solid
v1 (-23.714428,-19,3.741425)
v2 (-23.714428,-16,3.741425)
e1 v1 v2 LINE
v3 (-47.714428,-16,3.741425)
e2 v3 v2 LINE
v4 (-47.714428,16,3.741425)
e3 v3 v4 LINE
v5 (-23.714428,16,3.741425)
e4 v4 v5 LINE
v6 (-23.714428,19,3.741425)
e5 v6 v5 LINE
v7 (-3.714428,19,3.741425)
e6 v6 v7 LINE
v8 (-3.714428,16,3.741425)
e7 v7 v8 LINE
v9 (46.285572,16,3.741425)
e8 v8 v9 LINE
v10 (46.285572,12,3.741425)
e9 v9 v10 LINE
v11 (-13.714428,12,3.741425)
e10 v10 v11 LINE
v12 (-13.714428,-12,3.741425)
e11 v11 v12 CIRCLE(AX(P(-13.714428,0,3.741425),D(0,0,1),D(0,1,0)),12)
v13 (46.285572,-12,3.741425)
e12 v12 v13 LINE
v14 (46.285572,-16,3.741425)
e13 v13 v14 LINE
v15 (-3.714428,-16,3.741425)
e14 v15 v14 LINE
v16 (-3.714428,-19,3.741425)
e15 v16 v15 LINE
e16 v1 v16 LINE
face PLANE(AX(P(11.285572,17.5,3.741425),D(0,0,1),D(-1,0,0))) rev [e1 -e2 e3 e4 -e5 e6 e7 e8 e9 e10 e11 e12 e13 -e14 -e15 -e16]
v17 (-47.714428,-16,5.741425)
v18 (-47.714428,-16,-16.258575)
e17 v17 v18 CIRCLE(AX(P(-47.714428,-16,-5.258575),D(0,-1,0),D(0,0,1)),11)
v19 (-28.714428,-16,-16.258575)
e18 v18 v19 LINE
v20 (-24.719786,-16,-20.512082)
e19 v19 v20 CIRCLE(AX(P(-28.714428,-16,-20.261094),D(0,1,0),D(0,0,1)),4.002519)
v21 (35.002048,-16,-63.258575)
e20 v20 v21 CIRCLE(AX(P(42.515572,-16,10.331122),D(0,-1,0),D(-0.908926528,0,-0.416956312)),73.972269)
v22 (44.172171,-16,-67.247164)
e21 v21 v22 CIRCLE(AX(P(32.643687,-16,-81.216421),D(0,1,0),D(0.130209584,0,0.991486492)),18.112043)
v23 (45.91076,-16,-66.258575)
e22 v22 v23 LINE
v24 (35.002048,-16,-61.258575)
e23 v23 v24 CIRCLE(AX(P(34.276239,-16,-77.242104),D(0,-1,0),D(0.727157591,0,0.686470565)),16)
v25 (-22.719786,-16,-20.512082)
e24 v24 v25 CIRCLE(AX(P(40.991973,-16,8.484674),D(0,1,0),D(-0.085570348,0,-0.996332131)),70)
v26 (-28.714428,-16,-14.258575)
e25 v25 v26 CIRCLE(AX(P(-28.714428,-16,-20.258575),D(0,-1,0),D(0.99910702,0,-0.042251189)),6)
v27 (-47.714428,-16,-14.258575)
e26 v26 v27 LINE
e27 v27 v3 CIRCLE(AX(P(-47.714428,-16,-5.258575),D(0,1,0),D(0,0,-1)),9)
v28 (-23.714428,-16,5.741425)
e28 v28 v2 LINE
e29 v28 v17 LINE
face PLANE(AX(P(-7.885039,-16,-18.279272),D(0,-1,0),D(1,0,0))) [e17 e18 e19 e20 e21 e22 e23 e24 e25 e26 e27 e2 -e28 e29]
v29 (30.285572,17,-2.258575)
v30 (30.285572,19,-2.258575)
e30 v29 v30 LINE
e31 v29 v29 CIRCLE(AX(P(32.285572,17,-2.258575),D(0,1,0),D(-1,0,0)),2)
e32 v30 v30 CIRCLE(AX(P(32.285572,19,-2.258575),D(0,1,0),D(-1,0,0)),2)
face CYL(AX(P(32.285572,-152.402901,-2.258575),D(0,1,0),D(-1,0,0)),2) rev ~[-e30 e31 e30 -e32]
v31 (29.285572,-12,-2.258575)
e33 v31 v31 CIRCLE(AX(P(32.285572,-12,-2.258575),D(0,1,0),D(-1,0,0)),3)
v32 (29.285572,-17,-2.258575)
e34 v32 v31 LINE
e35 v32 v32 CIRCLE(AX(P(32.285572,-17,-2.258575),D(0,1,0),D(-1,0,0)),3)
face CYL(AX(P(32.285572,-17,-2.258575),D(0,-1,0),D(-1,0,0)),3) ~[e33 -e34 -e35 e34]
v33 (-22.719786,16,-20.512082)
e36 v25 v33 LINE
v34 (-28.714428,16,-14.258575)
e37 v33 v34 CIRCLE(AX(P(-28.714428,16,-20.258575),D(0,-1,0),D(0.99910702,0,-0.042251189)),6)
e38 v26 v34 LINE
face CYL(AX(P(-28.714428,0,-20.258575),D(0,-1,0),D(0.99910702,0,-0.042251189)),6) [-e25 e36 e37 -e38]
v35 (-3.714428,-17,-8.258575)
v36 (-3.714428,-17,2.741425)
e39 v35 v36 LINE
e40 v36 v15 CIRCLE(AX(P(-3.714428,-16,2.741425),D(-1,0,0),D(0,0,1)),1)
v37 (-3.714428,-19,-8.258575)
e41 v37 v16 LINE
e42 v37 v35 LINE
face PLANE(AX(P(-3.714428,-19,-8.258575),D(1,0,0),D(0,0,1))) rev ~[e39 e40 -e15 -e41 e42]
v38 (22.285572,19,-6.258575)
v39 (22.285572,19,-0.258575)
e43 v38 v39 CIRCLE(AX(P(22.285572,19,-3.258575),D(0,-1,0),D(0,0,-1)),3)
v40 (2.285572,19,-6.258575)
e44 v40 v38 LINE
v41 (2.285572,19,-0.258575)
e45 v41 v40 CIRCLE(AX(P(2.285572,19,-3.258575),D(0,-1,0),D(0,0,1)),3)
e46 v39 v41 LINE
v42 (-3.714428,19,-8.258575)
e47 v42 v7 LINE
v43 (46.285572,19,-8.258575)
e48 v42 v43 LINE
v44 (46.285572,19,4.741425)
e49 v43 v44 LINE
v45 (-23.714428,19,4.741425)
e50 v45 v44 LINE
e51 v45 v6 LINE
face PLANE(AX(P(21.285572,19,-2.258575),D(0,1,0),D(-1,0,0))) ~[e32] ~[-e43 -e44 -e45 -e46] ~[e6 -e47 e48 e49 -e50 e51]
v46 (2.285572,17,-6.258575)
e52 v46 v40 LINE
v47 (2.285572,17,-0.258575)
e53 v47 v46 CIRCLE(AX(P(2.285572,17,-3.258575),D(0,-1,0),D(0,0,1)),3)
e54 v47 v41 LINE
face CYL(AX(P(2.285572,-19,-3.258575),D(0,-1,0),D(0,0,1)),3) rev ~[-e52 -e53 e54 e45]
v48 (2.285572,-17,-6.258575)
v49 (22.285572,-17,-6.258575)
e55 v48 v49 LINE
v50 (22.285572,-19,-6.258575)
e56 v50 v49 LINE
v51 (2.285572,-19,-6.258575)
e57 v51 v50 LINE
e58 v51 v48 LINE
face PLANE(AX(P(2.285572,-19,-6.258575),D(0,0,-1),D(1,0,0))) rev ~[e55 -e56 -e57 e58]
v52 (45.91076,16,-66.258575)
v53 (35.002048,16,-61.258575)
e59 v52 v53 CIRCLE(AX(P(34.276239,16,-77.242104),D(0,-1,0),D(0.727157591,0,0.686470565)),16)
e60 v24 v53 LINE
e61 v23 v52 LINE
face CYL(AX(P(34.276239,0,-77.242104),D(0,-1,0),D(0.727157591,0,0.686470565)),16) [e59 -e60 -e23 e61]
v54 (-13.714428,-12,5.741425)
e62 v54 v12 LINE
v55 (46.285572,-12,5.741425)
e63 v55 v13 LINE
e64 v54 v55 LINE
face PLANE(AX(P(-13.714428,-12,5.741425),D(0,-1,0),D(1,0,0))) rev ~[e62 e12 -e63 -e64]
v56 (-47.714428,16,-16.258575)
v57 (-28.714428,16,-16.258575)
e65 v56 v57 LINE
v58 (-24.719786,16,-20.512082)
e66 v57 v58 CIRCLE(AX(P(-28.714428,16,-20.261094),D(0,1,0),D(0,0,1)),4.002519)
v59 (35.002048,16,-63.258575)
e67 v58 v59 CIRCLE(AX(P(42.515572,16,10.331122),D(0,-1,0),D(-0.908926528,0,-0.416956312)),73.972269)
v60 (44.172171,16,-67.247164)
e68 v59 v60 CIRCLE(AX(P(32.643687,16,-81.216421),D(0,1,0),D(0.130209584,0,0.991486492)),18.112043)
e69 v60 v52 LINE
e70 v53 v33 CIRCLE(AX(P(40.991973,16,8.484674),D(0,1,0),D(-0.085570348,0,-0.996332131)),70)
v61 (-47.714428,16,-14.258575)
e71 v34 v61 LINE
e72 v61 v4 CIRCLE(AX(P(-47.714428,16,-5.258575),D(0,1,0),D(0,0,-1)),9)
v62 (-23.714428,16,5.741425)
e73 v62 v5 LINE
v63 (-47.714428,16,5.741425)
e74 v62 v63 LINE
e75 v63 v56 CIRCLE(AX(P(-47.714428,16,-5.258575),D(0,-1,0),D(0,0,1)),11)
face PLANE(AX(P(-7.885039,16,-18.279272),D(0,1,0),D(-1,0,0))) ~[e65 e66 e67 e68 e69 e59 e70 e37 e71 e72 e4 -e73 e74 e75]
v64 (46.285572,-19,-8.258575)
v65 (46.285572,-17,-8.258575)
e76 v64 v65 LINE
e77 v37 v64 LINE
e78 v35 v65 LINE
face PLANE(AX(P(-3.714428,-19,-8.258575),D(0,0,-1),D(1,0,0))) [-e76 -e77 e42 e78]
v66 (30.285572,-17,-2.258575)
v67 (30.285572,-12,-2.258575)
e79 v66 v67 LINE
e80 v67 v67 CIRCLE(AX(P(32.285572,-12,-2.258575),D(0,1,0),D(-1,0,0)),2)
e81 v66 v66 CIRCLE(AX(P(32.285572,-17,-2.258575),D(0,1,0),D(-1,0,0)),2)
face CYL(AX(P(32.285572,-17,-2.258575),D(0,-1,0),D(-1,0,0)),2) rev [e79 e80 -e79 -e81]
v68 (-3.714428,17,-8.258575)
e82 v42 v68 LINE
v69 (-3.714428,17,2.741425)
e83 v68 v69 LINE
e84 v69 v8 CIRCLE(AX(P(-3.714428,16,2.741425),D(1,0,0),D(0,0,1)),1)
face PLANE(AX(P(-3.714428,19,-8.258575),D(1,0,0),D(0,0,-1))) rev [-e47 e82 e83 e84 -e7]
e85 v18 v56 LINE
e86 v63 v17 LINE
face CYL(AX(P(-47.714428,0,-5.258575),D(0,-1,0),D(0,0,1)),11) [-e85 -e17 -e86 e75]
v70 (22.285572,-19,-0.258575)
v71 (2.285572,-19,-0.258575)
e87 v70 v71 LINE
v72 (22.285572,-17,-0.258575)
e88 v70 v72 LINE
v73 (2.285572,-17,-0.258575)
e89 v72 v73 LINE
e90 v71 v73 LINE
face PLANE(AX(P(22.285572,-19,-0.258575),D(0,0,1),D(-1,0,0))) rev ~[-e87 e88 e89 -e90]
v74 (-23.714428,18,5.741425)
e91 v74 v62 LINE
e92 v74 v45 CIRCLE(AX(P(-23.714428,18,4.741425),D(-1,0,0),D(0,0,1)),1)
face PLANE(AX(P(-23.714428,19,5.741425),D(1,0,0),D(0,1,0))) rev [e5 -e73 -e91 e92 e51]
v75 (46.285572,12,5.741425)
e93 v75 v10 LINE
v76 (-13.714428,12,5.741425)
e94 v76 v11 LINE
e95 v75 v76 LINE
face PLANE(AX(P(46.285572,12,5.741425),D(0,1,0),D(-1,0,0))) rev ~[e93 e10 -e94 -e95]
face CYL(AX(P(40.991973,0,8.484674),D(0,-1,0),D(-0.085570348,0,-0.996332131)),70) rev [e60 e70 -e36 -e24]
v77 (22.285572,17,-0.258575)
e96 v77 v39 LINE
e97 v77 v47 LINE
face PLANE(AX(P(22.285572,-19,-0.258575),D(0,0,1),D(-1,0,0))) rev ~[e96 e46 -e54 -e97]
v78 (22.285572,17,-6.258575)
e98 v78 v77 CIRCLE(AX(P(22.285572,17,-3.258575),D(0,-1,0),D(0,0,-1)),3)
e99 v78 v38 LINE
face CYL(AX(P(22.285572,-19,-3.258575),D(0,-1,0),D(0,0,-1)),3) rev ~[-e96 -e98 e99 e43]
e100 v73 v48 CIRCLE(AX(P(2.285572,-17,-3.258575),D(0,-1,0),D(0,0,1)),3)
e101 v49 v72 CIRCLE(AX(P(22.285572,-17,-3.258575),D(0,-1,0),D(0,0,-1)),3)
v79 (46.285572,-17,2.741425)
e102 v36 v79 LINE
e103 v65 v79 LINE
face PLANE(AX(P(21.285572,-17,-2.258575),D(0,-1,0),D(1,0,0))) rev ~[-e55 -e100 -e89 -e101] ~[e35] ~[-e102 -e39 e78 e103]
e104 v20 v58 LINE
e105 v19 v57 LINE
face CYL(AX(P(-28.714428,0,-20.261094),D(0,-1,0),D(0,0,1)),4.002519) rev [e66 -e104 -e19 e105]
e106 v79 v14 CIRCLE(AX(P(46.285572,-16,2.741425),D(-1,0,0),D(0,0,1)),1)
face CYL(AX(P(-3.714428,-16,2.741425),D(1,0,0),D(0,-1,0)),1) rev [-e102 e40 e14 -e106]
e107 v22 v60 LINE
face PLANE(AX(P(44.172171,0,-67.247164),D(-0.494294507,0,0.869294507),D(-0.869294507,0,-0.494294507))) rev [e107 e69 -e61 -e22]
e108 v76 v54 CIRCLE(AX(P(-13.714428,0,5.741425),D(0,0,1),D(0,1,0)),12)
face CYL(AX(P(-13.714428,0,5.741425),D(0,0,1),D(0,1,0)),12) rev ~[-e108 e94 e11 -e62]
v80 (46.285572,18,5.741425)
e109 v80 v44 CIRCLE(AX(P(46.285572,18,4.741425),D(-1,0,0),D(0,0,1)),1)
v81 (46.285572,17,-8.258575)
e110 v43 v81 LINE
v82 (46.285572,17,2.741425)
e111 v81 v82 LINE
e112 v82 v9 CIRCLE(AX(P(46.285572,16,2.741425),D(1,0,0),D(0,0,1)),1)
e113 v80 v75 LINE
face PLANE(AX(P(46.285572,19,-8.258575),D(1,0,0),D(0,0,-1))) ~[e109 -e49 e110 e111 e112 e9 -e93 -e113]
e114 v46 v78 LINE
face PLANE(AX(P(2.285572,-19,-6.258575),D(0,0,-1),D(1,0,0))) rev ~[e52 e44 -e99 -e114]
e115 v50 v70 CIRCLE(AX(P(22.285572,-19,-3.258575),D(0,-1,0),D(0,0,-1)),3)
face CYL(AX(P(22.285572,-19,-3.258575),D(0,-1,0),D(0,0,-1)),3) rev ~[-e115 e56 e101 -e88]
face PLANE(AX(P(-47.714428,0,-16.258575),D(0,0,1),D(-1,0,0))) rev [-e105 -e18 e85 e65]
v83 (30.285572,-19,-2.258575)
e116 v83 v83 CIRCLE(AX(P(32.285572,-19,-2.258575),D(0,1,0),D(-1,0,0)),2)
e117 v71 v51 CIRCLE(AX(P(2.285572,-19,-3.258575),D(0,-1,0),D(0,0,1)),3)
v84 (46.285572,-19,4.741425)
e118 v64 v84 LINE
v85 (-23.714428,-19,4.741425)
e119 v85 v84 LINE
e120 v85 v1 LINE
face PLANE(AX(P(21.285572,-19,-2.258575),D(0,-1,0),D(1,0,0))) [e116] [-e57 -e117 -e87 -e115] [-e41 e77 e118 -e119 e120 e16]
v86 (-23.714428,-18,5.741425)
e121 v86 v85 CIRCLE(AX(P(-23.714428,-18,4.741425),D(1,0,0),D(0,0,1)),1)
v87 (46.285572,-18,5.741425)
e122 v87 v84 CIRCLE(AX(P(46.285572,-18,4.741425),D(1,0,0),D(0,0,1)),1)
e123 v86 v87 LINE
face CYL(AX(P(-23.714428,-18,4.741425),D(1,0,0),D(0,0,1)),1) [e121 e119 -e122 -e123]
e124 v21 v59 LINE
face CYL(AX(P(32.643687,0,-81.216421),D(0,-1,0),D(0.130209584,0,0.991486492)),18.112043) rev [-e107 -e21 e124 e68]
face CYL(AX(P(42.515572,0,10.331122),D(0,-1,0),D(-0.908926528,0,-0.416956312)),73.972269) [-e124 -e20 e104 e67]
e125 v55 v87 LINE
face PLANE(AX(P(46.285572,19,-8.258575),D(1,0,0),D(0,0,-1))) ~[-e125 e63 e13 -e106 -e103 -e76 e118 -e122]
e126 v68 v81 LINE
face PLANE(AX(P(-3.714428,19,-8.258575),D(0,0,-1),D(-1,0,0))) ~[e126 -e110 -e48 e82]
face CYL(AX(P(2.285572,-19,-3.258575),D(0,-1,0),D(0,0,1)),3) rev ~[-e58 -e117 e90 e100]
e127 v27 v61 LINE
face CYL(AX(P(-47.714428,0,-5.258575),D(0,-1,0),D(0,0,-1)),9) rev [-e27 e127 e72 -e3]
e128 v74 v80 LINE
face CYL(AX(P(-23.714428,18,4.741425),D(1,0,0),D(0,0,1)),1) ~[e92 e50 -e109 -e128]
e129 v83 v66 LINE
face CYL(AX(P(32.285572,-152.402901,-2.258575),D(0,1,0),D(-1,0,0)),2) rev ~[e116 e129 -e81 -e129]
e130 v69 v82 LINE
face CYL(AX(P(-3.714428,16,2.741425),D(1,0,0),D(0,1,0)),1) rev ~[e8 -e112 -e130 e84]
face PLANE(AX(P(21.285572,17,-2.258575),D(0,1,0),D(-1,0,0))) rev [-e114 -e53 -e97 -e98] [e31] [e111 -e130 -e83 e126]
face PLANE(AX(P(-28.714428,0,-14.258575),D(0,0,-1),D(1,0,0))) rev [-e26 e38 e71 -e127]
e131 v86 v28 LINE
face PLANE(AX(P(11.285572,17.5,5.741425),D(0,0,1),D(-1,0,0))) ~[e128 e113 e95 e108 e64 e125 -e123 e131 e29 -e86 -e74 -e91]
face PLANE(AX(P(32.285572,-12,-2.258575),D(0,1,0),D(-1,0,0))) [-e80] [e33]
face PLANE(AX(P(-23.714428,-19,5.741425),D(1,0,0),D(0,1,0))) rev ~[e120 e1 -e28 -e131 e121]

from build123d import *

# Parameters (mm, degrees)
F1_DEPTH  = 16
F2_W      = 70
F2_H      = 3
F3_DEPTH  = 2
F4_W      = 50
F4_H      = 12
F5_DEPTH  = 2
F6_R      = 1
F9_DEPTH  = 2
F11_DEPTH = 38.001
F13_D     = 4
F14_R     = 3
F14_R_2   = 2
F15_DEPTH = 5


with BuildPart() as f1:
    # F0 (on Front) → F1 (new body)
    with BuildSketch(Plane.XZ):
        with BuildLine():
            Line((46.2855722755, 5.7414249778), (-47.7144277245, 5.7414249778))
            ThreePointArc((-47.7144277245, 5.7414249778), (-58.7144277245, -5.2585750222), (-47.7144277245, -16.2585750222))
            Line((-47.7144277245, -16.2585750222), (-28.7144277245, -16.2585750222))
            ThreePointArc((-28.7144277245, -16.2585750222), (-25.7968307423, -17.5210599177), (-24.7197856057, -20.5120821569))
            ThreePointArc((-24.7197856057, -20.5120821569), (-0.5386319719, -49.8206199667), (35.0020481502, -63.2585750222))
            ThreePointArc((35.0020481502, -63.2585750222), (39.8678360266, -64.6074545818), (44.1721712505, -67.2471640366))
            Line((44.1721712505, -67.2471640366), (45.9107602648, -66.2585750222))
            ThreePointArc((45.9107602648, -66.2585750222), (40.9429054682, -62.6971545828), (35.0020481502, -61.2585750222))
            ThreePointArc((35.0020481502, -61.2585750222), (0.6230450398, -48.7022972109), (-22.7197856057, -20.5120821569))
            ThreePointArc((-22.7197856057, -20.5120821569), (-24.3830859689, -16.1065299122), (-28.7144277245, -14.2585750222))
            Line((-28.7144277245, -14.2585750222), (-47.7144277245, -14.2585750222))
            ThreePointArc((-47.7144277245, -14.2585750222), (-56.7144277245, -5.2585750222), (-47.7144277245, 3.7414249778))
            Line((-47.7144277245, 3.7414249778), (46.2855722755, 3.7414249778))
            Line((46.2855722755, 3.7414249778), (46.2855722755, 5.7414249778))
        make_face()
    extrude(amount=F1_DEPTH)

    # F2 (on face) → F3 (join)
    with BuildSketch(Plane.XY.offset(5.7414249778)):
        with Locations((11.2855722755, -17.5)):
            Rectangle(F2_W, F2_H)
    extrude(amount=-F3_DEPTH)

    # F4 (on face) → F5 (join)
    with BuildSketch(Plane.XZ.offset(19)):
        with Locations((21.2855722755, -2.2585750222)):
            Rectangle(F4_W, F4_H)
    extrude(amount=-F5_DEPTH)

    # F6
    f6_edges = [f1.edges().sort_by_distance(p)[0] for p in [
        (11.285572, -19, 5.741425),
        (21.285572, -17, 3.741425),
    ]]
    fillet(f6_edges, radius=F6_R)

    # F7: F1 across plane


with BuildPart() as f1_1:
    add(f1.part)
    add(f1.part.mirror(Plane.XZ))

    # F8 (on face) → F9 (cut)
    with BuildSketch(Plane.XY.offset(5.7414249778)):
        with BuildLine():
            Line((46.2855722755, 12), (-13.7144277245, 12))
            ThreePointArc((-13.7144277245, 12), (-25.7144277245, 0), (-13.7144277245, -12))
            Line((-13.7144277245, -12), (46.2855722755, -12))
            Line((46.2855722755, -12), (46.2855722755, 12))
        make_face()
    extrude(amount=-F9_DEPTH, mode=Mode.SUBTRACT)

    # F10 (on face) → F11 (cut, through all)
    with BuildSketch(Plane.XZ.offset(19)):
        with BuildLine():
            ThreePointArc((2.2855722755, -0.2585750222), (-0.7144277245, -3.2585750222), (2.2855722755, -6.2585750222))
            Line((2.2855722755, -6.2585750222), (22.2855722755, -6.2585750222))
            ThreePointArc((22.2855722755, -6.2585750222), (25.2855722755, -3.2585750222), (22.2855722755, -0.2585750222))
            Line((22.2855722755, -0.2585750222), (2.2855722755, -0.2585750222))
        make_face()
    extrude(amount=-F11_DEPTH, mode=Mode.SUBTRACT)

    # F13 (through all)
    with Locations(Plane.XZ.offset(19)):
        with Locations((32.2855722755, -2.2585750222)):
            Hole(F13_D / 2)

    # F14 (on face) → F15 (join)
    with BuildSketch(Plane(origin=(0, -17, 0), x_dir=(-1, 0, 0), z_dir=(0, 1, 0))):
        with Locations((-32.2855722755, -2.2585750222)):
            Circle(F14_R)
        with Locations((-32.2855722755, -2.2585750222)):
            Circle(F14_R_2, mode=Mode.SUBTRACT)
    extrude(amount=F15_DEPTH)


solid = f1_1.part
